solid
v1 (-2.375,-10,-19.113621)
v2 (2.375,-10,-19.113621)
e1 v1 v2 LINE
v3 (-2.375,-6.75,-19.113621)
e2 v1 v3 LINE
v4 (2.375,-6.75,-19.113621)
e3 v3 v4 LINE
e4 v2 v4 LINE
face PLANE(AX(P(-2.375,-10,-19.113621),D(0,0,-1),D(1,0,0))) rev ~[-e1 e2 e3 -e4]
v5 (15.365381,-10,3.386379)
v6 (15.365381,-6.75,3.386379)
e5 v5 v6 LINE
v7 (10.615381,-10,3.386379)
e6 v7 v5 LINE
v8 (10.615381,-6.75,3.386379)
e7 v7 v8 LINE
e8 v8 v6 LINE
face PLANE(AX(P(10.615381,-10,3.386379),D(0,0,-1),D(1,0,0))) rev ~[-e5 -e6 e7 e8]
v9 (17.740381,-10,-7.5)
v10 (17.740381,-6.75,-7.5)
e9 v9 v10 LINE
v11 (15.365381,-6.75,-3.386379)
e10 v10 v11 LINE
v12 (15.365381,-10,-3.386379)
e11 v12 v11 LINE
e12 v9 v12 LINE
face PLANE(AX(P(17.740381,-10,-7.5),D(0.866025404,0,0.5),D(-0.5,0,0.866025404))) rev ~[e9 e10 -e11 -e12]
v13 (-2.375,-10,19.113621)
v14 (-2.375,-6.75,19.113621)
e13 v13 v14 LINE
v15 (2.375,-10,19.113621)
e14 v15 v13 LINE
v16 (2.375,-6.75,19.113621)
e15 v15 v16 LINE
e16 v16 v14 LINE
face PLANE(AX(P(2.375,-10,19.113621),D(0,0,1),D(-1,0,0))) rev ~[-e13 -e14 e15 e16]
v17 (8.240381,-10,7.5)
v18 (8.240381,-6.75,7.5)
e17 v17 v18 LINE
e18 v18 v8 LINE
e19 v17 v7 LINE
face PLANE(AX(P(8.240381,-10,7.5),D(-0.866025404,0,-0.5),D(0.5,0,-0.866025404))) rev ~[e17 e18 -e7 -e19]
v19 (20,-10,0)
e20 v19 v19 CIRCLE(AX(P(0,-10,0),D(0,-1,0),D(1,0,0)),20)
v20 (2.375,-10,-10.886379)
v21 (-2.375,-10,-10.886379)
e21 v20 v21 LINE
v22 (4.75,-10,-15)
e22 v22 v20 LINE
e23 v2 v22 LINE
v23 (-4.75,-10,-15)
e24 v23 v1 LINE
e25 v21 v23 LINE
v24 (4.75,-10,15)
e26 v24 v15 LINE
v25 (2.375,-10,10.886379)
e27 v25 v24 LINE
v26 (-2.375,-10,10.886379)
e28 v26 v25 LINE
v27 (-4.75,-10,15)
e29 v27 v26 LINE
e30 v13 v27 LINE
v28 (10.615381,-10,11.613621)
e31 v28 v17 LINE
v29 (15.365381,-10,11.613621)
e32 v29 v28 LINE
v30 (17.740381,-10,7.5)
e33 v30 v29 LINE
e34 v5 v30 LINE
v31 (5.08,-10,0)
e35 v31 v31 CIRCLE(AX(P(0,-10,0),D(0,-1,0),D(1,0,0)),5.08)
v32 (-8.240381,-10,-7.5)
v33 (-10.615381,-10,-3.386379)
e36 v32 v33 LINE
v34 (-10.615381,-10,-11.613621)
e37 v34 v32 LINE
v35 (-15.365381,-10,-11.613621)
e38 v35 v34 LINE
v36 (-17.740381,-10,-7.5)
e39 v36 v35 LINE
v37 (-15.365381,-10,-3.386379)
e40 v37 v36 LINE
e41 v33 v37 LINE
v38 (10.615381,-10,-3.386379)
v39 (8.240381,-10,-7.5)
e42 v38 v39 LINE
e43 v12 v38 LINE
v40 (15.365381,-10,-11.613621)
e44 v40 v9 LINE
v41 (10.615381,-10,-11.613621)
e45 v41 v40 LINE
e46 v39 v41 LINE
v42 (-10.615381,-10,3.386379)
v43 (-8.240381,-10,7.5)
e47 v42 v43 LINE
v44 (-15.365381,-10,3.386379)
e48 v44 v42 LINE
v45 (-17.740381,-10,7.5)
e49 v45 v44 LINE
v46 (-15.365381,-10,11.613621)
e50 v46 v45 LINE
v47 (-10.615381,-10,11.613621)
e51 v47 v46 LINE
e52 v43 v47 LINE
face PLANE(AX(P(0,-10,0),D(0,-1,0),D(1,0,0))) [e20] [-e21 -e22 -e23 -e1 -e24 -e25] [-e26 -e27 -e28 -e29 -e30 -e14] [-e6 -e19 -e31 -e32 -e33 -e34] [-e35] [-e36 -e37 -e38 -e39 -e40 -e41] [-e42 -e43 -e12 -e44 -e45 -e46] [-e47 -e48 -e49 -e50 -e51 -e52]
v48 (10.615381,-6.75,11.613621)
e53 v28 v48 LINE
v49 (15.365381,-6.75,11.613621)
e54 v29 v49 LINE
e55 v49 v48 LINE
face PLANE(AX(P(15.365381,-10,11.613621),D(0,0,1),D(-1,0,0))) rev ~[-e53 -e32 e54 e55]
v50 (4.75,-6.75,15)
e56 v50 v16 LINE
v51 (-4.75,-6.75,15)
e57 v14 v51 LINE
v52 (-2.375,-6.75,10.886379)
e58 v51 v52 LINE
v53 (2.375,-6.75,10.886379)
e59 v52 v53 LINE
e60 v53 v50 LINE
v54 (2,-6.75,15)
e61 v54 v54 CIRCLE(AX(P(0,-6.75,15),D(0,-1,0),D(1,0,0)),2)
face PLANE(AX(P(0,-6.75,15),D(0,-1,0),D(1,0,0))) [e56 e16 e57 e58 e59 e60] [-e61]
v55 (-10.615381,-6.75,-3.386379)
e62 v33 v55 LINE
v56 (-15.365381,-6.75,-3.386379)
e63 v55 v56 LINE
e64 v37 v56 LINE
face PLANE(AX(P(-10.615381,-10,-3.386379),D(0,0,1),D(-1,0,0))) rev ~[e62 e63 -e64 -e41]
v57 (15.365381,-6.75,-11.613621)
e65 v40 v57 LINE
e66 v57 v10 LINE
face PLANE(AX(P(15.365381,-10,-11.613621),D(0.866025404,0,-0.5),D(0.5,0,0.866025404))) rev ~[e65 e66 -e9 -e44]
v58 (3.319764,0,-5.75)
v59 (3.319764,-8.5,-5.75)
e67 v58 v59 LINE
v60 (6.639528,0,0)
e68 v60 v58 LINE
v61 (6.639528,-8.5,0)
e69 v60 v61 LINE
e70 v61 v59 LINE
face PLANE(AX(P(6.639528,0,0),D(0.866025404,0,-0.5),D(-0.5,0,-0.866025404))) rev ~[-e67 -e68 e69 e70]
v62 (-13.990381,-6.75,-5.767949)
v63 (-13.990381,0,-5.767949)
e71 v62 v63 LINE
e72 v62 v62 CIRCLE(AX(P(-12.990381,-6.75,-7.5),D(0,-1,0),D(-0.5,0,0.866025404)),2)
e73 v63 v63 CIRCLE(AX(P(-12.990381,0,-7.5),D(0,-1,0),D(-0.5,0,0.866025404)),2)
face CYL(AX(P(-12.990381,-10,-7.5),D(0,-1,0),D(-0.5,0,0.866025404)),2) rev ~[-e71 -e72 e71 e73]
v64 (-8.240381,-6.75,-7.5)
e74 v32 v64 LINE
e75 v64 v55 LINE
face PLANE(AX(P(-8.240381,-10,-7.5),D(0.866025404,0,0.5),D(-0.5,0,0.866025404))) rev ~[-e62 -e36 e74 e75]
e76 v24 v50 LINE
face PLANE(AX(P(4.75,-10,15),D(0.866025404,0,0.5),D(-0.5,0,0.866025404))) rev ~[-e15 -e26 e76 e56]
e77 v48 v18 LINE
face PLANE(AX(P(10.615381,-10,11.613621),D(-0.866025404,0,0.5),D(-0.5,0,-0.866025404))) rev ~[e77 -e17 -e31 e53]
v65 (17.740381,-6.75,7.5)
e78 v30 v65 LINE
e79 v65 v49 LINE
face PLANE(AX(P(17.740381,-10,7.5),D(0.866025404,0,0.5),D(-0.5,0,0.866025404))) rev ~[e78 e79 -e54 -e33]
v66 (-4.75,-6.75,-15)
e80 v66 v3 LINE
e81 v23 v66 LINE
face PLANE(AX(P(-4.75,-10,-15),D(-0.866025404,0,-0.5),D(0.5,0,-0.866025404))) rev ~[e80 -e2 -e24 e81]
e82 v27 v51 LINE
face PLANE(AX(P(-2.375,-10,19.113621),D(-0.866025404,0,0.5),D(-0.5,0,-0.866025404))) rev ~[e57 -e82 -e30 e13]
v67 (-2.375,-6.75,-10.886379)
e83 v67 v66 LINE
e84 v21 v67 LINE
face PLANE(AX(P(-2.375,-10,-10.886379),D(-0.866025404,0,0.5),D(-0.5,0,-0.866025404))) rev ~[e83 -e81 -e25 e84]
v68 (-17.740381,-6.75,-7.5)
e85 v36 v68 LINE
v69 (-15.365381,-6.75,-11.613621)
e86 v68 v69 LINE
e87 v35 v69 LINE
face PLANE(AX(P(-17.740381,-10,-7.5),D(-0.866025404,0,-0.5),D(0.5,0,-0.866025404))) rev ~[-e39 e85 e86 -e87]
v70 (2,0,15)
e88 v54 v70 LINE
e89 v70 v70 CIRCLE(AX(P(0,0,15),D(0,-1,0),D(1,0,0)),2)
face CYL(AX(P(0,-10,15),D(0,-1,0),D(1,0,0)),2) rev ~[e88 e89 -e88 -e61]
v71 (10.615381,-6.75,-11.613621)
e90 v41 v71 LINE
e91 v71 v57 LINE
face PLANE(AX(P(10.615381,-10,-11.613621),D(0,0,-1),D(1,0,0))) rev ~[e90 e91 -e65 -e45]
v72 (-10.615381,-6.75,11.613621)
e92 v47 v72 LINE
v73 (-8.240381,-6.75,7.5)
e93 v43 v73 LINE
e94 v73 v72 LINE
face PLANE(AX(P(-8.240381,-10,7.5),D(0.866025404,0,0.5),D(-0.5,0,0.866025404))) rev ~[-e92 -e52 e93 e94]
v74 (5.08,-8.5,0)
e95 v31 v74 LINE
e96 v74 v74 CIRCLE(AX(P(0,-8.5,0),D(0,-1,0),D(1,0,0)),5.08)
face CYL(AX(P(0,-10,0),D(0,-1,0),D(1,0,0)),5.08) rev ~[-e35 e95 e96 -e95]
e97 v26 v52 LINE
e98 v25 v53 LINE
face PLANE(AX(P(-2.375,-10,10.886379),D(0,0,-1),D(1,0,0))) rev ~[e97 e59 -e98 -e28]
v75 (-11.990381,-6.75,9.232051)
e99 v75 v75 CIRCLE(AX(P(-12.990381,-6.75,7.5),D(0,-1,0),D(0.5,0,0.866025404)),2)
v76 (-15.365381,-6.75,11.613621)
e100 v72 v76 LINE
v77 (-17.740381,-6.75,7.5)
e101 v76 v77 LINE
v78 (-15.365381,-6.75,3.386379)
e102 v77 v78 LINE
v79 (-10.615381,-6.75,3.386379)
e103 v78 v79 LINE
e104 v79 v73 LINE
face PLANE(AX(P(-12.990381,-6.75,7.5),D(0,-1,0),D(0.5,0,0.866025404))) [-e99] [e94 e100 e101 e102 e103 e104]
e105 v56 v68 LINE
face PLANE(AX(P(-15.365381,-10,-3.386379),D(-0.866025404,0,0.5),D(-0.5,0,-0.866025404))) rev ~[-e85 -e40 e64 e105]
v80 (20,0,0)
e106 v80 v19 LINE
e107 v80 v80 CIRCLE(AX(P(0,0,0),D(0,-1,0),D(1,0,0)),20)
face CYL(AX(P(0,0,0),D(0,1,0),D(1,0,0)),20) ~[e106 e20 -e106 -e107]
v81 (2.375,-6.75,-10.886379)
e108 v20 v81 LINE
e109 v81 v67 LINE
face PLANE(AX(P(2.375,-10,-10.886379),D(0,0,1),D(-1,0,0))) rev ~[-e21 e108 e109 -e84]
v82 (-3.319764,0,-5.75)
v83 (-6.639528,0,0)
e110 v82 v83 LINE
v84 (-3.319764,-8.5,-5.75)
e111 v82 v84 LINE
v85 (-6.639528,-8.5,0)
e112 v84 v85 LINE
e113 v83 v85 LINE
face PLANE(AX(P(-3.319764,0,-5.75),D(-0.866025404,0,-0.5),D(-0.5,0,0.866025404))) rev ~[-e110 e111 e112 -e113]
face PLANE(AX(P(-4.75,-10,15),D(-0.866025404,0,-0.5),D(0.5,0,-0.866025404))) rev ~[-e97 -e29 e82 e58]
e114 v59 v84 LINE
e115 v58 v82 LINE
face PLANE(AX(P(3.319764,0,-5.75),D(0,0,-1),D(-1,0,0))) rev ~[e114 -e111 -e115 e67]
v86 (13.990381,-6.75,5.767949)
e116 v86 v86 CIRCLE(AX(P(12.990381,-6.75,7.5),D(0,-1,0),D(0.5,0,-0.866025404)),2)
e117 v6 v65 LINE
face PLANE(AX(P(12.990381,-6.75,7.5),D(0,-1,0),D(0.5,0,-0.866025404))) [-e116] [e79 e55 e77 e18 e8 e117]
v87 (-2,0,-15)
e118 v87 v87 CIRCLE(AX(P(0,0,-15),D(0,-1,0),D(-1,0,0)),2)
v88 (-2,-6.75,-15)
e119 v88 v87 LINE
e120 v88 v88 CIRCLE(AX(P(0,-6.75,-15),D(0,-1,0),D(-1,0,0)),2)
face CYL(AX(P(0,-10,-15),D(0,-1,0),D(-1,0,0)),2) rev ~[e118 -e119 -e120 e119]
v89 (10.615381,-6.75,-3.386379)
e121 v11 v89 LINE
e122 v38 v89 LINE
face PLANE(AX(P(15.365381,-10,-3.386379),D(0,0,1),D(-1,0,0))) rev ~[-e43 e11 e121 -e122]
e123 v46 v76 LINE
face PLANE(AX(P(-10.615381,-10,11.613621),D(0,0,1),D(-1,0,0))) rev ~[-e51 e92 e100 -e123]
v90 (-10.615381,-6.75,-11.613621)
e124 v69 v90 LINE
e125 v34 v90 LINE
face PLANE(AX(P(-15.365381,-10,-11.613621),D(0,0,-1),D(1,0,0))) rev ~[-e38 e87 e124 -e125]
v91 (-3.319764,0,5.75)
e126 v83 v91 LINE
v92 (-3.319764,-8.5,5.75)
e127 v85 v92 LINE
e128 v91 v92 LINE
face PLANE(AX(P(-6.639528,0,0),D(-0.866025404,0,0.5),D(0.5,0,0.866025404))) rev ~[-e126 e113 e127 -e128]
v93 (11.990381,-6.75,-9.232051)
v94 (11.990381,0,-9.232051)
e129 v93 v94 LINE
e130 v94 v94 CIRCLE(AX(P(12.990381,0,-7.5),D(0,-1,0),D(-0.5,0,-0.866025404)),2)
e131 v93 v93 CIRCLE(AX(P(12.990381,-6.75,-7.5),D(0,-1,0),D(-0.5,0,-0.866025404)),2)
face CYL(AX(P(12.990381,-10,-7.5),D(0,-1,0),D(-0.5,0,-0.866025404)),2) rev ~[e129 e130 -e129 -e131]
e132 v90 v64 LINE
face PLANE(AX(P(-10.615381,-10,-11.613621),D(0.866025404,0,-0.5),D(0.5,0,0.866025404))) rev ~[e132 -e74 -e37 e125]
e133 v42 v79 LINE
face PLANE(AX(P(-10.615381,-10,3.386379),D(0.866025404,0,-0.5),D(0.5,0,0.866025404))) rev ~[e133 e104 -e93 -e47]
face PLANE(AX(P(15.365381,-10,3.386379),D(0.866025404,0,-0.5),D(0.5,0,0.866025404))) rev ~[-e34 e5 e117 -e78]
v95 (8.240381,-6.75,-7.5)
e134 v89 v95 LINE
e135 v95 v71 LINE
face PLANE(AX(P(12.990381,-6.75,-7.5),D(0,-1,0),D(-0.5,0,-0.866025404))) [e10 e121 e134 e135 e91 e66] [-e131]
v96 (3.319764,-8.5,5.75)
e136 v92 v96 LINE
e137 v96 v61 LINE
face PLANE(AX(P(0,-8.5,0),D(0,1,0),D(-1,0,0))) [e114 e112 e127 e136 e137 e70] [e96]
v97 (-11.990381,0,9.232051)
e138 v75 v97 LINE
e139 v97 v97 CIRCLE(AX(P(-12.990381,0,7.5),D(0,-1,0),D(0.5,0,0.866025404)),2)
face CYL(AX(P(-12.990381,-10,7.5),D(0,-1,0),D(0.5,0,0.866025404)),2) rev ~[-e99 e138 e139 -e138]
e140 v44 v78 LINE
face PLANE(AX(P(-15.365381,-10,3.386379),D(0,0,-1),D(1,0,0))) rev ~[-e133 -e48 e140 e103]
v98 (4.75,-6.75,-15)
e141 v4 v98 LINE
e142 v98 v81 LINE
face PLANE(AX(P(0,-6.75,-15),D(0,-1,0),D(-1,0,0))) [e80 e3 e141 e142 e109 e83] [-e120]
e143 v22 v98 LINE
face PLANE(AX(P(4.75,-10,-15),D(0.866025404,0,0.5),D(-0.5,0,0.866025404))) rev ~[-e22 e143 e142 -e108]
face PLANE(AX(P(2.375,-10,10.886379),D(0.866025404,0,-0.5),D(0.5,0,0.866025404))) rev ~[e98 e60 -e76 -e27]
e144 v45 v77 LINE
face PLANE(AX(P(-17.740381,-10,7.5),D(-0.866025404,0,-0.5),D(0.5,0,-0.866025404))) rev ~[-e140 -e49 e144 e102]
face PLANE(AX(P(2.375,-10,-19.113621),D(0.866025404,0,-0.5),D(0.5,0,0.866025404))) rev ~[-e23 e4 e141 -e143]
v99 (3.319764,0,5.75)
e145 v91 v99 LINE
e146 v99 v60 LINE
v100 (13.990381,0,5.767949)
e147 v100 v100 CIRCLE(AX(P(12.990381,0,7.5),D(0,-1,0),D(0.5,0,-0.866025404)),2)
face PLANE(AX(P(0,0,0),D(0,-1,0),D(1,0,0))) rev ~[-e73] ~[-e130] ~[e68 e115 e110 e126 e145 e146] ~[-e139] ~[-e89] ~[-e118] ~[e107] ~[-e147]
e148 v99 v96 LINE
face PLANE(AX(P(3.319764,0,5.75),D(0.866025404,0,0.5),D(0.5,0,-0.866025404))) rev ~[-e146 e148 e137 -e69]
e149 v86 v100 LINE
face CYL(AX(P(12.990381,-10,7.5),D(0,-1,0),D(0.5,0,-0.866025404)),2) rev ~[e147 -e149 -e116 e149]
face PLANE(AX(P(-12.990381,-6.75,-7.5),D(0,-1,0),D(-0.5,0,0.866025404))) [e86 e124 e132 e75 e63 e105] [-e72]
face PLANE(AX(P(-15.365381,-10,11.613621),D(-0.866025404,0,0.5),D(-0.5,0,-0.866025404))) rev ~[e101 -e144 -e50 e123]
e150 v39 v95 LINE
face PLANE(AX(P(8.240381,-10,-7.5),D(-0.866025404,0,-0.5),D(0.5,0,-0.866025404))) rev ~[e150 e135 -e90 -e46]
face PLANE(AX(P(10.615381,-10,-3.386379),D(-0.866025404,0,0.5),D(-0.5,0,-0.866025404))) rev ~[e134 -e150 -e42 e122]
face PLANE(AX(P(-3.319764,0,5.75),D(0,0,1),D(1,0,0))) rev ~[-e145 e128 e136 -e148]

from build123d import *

# Parameters (mm, degrees)
F0_R            = 20
F1_DEPTH        = 10
F3_DEPTH        = 8.5
F4_R            = 2
F5_DEPTH        = 10.001
F5_COPIES_COUNT = 6
F7_DEPTH        = 3.25
F7_COPIES_COUNT = 6
F8_R            = 5.08
F9_DEPTH        = 10.001


# Not quite as in the source:
# - a pattern or mirror of a feature is missing from the dataset's text; its kind, count and spacing are read off the source's solid


with BuildPart() as f1:
    # F0 (on Front) → F1 (new body)
    with BuildSketch(Plane.XZ):
        Circle(F0_R)
    extrude(amount=F1_DEPTH)

    # F2 (on face) → F3 (cut)
    with BuildSketch(Plane(origin=(0, 0, 0), x_dir=(-1, 0, 0), z_dir=(0, 1, 0))):
        Polygon((3.3197640478, 5.75), (-3.3197640478, 5.75), (-6.6395280957, 0), (-3.3197640478, -5.75), (3.3197640478, -5.75), (6.6395280957, 0), align=None)
    extrude(amount=-F3_DEPTH, mode=Mode.SUBTRACT)

    # F4 (on face) → F5 (cut, through all)
    with BuildSketch(Plane.XZ.offset(10)):
        with Locations((0, 15)):
            Circle(F4_R)
    f5 = extrude(amount=-F5_DEPTH, mode=Mode.SUBTRACT)

    # F5_copies: F5 ×6 about axis
    f5_copies_axis = Axis((0, 0, 0), (0, 1, 0))
    for i in range(1, F5_COPIES_COUNT):
        add(f5.rotate(f5_copies_axis, i * 360 / F5_COPIES_COUNT), mode=Mode.SUBTRACT)

    # F6 (on face) → F7 (cut)
    with BuildSketch(Plane.XZ.offset(10)):
        Polygon((2.375, 19.113620668), (-2.375, 19.113620668), (-4.75, 15), (-2.375, 10.886379332), (2.375, 10.886379332), (4.75, 15), align=None)
    f7 = extrude(amount=-F7_DEPTH, mode=Mode.SUBTRACT)

    # F7_copies: F7 ×6 about axis
    f7_copies_axis = Axis((0, 0, 0), (0, 1, 0))
    for i in range(1, F7_COPIES_COUNT):
        add(f7.rotate(f7_copies_axis, i * 360 / F7_COPIES_COUNT), mode=Mode.SUBTRACT)

    # F8 (on face) → F9 (cut, through all)
    with BuildSketch(Plane.XZ.offset(10)):
        Circle(F8_R)
    extrude(amount=-F9_DEPTH, mode=Mode.SUBTRACT)


solid = f1.part
